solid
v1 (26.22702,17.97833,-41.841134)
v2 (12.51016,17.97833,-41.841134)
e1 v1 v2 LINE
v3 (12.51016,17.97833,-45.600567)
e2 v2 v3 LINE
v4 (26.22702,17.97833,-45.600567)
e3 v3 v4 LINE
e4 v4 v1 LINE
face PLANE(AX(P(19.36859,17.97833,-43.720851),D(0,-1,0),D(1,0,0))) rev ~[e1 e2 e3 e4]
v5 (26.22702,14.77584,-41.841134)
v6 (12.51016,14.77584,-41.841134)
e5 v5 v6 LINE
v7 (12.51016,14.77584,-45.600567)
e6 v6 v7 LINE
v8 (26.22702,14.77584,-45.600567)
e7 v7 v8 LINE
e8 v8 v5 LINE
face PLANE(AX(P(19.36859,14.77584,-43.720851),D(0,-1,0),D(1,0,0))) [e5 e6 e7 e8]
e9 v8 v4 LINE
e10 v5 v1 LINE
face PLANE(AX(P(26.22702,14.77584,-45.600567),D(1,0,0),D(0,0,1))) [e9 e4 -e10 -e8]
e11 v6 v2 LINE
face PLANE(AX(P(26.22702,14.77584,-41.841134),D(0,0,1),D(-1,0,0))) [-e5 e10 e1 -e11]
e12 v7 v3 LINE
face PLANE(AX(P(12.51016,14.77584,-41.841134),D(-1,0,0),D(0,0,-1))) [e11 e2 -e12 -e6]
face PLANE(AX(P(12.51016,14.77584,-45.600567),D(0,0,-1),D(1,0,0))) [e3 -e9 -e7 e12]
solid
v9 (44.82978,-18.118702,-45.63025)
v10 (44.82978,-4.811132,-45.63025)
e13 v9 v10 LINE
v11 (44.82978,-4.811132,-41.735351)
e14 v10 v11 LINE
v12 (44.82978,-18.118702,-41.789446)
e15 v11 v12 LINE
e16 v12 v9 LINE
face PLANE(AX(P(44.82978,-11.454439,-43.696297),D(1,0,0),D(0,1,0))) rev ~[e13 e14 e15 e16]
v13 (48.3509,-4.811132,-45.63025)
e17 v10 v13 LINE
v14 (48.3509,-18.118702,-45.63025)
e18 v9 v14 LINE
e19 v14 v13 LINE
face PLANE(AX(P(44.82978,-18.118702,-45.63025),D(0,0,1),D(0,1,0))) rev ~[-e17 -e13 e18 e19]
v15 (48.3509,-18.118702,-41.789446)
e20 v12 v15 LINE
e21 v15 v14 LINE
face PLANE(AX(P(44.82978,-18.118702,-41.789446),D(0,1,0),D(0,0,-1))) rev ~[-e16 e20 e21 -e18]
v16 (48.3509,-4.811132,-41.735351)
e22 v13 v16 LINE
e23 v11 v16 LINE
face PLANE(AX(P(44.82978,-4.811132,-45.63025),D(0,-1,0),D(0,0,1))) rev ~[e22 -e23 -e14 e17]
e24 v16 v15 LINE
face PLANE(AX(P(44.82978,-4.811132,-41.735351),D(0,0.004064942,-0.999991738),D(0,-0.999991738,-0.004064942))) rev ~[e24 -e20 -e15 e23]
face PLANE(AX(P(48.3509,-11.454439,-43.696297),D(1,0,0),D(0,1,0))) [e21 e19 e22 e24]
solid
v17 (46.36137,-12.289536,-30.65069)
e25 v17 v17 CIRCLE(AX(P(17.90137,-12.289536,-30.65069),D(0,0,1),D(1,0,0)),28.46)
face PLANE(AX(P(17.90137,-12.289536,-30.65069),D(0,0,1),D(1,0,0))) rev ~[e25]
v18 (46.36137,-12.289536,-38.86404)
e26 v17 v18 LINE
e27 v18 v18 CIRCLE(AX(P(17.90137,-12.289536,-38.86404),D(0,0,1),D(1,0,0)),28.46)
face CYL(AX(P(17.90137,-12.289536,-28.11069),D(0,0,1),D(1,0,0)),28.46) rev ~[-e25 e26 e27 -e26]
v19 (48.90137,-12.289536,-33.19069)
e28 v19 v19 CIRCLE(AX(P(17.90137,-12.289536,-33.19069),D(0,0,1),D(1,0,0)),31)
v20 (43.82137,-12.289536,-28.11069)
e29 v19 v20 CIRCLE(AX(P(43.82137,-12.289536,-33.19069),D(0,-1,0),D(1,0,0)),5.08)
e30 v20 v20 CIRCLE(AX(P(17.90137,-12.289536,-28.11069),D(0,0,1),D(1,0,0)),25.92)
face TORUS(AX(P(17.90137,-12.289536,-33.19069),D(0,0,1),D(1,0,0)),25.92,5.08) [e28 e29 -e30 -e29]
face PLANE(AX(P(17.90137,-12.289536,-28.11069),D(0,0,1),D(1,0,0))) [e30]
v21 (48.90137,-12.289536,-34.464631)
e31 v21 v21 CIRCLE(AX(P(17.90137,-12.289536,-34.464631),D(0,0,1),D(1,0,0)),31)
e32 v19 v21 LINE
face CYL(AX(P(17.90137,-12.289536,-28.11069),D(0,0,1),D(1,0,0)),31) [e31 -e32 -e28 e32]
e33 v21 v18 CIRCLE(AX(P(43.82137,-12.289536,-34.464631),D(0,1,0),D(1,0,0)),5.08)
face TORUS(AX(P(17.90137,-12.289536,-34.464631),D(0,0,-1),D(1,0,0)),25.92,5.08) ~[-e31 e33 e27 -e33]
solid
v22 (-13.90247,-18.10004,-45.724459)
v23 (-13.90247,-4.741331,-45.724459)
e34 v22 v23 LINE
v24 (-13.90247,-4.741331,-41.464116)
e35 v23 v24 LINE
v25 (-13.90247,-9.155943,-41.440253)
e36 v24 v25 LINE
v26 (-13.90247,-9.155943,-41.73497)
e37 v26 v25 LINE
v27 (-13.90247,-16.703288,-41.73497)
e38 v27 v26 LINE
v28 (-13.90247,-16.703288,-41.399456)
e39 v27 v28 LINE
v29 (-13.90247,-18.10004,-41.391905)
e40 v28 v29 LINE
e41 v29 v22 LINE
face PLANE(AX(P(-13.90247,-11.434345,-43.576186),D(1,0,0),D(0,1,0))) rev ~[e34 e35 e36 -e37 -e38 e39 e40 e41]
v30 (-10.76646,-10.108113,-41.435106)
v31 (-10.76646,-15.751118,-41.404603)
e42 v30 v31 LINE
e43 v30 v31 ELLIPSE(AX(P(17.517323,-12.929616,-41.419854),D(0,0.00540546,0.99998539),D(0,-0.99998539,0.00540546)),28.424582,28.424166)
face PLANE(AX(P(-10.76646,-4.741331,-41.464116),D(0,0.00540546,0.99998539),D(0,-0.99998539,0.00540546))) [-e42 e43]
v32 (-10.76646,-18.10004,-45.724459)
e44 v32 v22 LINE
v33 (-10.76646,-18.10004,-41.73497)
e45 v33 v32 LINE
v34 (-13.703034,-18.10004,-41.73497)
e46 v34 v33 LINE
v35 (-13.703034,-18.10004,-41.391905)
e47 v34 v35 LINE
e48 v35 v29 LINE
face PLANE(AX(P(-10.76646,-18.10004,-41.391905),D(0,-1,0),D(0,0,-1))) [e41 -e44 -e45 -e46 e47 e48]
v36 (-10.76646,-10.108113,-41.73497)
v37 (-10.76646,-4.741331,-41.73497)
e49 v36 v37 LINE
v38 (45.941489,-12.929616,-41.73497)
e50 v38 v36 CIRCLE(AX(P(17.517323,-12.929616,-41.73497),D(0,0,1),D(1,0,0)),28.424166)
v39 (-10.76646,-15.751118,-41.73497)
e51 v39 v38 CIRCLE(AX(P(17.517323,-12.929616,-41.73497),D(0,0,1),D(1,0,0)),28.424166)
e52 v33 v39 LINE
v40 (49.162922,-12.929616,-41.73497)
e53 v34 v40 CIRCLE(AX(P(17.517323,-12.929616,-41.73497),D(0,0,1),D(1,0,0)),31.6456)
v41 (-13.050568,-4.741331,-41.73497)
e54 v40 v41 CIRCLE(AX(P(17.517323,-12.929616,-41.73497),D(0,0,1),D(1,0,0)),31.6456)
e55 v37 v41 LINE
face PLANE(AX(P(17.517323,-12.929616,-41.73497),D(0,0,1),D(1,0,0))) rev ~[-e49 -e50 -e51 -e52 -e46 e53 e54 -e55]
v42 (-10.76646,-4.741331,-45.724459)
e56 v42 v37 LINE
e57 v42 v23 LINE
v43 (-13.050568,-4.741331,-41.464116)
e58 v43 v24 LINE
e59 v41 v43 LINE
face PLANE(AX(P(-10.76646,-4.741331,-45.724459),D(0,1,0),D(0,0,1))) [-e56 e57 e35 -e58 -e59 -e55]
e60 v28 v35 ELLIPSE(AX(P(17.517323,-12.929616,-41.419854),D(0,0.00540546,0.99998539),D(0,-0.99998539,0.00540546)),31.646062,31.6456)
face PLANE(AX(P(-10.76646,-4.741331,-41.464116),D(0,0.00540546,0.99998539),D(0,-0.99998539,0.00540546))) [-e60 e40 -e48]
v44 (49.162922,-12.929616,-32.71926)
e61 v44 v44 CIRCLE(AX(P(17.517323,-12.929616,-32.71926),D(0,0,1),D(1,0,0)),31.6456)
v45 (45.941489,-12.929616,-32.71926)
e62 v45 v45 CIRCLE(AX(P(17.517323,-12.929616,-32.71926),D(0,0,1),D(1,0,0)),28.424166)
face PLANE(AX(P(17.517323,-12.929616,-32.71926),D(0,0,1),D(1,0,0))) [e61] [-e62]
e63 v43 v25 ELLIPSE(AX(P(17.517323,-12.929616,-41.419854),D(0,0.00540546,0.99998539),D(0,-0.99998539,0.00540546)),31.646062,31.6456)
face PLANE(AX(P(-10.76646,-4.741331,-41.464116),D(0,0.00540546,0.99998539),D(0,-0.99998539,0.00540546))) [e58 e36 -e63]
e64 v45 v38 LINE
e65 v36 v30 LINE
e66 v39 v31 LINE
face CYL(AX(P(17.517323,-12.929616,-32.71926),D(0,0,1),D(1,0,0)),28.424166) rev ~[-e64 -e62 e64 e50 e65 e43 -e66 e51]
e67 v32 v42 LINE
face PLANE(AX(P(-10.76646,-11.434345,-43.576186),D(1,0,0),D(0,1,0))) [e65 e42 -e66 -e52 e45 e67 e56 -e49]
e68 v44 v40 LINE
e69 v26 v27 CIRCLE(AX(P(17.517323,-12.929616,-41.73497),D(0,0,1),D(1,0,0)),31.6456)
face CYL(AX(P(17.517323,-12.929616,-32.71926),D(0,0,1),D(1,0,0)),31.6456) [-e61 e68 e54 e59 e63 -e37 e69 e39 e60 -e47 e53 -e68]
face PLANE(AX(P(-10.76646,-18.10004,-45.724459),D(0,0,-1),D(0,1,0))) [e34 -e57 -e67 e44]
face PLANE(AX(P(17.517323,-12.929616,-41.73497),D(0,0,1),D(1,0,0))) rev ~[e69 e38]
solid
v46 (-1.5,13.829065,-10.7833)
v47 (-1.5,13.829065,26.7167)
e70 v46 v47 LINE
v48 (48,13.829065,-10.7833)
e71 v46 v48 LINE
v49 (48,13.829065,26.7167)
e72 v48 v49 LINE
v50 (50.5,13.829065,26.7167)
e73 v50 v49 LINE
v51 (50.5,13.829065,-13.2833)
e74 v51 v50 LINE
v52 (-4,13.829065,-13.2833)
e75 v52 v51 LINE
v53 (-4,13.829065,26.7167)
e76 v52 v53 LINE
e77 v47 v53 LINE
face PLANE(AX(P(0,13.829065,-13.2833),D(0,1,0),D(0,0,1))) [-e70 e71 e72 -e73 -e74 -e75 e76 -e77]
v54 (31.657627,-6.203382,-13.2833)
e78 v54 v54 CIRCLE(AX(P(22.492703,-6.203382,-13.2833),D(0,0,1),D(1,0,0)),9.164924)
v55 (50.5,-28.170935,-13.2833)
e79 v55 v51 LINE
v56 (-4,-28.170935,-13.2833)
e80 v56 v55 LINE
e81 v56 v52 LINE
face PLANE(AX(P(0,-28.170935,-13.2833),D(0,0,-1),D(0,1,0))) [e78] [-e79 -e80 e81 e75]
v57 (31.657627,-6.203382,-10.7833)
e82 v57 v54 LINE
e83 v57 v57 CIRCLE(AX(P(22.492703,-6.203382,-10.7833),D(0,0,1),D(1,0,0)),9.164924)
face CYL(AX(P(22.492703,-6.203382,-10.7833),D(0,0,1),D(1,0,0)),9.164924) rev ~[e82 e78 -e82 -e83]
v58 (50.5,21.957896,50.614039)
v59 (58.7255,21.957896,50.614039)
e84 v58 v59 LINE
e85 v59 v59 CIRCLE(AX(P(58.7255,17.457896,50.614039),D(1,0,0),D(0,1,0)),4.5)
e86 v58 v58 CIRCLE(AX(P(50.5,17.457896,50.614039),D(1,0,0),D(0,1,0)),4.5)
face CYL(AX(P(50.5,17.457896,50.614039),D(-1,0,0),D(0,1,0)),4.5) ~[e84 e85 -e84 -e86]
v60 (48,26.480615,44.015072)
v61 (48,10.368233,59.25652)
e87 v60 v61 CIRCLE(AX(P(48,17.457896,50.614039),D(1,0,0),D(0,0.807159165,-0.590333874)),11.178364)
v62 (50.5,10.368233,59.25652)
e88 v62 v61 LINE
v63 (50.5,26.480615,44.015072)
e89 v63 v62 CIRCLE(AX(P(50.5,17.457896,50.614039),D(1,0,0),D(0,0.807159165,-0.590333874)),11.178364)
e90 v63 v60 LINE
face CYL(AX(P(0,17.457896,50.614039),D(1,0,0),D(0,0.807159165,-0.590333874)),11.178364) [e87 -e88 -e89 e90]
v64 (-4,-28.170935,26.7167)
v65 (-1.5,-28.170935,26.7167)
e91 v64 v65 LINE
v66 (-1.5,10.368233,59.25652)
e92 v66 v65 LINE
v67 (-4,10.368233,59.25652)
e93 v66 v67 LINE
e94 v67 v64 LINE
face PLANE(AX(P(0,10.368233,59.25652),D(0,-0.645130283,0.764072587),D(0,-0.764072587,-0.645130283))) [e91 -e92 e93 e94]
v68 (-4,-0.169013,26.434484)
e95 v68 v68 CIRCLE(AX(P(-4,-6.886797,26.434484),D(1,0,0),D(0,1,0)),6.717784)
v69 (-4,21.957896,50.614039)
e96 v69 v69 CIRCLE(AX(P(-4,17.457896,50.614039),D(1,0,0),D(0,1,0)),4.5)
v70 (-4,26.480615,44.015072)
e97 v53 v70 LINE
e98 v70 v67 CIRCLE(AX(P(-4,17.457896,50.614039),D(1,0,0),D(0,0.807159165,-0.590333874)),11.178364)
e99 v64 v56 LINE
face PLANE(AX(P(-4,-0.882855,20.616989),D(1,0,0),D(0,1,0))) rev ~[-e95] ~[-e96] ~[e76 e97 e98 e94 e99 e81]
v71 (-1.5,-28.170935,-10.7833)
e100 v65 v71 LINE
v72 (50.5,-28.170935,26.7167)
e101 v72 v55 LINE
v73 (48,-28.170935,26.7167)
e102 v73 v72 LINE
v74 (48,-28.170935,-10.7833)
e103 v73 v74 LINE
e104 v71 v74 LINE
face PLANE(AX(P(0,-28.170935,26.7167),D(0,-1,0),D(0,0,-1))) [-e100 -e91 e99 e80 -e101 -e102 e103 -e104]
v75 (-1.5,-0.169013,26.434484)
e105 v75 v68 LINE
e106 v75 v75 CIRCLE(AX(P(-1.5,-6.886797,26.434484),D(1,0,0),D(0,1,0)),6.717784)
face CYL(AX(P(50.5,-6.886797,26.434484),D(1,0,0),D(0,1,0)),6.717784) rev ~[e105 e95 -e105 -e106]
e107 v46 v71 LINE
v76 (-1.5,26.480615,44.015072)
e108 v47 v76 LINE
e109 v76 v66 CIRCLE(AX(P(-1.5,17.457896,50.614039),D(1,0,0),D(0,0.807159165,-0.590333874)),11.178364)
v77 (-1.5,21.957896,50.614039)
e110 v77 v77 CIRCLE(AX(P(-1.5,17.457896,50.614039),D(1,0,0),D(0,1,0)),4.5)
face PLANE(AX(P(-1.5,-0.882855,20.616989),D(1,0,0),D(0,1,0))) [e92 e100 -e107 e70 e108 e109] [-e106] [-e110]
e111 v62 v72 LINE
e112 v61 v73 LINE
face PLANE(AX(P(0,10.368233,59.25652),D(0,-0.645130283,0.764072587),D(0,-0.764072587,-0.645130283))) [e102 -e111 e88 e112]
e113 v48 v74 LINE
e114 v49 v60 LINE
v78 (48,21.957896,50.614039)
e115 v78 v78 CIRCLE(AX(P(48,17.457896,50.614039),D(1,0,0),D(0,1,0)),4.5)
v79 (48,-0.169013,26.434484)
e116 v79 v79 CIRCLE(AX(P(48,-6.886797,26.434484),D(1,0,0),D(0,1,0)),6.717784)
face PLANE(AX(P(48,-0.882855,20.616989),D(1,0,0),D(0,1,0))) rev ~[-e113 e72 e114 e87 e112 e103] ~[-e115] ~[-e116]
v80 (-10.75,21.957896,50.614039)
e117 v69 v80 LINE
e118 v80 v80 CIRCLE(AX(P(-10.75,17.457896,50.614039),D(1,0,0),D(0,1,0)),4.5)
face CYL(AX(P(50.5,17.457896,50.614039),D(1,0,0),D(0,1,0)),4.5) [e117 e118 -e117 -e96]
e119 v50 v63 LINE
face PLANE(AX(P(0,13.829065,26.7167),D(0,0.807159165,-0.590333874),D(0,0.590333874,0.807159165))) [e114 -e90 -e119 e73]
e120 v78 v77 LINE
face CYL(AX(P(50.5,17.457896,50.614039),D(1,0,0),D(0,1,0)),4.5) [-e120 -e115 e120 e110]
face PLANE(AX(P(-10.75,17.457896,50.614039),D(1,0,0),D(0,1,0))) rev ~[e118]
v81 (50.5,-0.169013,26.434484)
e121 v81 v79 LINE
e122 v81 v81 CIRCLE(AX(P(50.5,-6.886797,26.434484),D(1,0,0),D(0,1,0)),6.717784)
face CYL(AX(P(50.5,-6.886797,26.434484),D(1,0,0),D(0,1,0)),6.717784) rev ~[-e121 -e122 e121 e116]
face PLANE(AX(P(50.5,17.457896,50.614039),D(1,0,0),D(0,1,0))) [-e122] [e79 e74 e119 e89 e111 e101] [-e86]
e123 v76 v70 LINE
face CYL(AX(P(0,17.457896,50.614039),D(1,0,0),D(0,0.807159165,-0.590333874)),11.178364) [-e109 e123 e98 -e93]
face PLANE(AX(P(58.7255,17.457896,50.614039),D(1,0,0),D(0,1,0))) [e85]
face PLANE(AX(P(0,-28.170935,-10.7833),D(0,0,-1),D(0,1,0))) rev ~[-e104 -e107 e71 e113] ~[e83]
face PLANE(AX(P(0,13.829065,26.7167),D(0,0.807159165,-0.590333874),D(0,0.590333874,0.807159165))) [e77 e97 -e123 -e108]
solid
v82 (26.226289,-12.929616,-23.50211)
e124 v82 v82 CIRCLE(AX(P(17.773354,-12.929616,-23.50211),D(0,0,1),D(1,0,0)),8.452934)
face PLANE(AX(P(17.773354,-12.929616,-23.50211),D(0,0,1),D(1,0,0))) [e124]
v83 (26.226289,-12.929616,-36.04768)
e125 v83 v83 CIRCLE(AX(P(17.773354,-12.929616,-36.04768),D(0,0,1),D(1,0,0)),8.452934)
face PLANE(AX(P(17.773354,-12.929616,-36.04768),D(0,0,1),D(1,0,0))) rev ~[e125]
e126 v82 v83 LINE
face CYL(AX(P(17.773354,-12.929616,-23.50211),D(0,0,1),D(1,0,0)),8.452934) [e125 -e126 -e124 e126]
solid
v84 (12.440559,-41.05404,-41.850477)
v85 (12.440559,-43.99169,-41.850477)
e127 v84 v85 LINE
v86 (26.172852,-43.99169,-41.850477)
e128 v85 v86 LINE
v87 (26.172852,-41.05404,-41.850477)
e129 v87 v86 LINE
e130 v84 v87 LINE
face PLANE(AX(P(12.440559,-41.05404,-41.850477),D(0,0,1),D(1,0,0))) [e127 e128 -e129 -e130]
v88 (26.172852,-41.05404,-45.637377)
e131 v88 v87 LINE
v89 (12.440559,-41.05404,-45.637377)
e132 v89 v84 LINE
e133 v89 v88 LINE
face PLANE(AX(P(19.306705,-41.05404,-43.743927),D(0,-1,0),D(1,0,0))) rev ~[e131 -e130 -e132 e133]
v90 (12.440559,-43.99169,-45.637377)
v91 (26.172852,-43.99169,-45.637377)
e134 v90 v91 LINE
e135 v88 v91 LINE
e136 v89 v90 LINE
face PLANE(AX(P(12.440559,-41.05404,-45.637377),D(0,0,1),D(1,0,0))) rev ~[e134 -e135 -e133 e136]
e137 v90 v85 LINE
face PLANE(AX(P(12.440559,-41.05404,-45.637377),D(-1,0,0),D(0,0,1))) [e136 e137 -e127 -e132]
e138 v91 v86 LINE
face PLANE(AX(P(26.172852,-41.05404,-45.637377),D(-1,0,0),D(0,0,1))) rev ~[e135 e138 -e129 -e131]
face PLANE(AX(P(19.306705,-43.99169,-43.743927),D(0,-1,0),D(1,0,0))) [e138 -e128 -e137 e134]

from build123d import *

# Parameters (mm, degrees)
F1_DEPTH       = 50.5
F1_DEPTH_BACK  = 4
F3_START       = -28.11069
F2_R           = 31
F3_DEPTH       = 10.75335
F4_T           = -2.54
F6_START       = -23.50211
F5_R           = 8.452934194
F6_DEPTH       = 12.54557
F8_START       = -32.71926
F7_R           = 31.6455996423
F7_R_2         = 28.4241664141
F8_DEPTH       = 9.01571
F10_START      = -14.77584
F10_DEPTH      = 3.20249
F12_START      = 41.05404
F11_W          = 13.7322936207
F11_H          = 3.7868991494
F12_DEPTH      = 2.93765
F14_START      = -10.76646
F14_DEPTH      = 3.13601
F16_START      = 44.82978
F16_DEPTH      = 3.52112
F18_T          = -2.5
F19_R          = 6.7177835251
F20_DEPTH      = 64.6292769679
F19_R_2        = 4.5
F21_DEPTH      = 61.25
F21_DEPTH_BACK = 8.2255
F22_R          = 9.1649239527
F23_DEPTH      = 25


# Not quite as in the source:
# - a fillet or chamfer that OpenCascade refuses, or shapes differently, is made with other operations: its cross-section is extruded or revolved along the edge and cut away or added
# - a feature names something its author has since deleted; it is built from what else it names


with BuildPart() as f1:
    # F0 (on Right) → F1 (new body, two sides)
    with BuildSketch(Plane.YZ) as f1_sk:
        with BuildLine():
            Line((10.3682326153, 59.2565201223), (-28.1709354445, 26.7167001963))
            Line((-28.1709354445, 26.7167001963), (-28.1709354445, -13.2832998037))
            Line((-28.1709354445, -13.2832998037), (13.8290645555, -13.2832998037))
            Line((13.8290645555, -13.2832998037), (13.8290645555, 26.7167001963))
            Line((13.8290645555, 26.7167001963), (26.480615139, 44.0150722861))
            ThreePointArc((26.480615139, 44.0150722861), (25.1396676432, 58.7347658993), (10.3682326153, 59.2565201223))
        make_face()
    extrude(amount=F1_DEPTH)
    extrude(f1_sk.sketch, amount=-F1_DEPTH_BACK)

    # F18
    f18_openings = [f1.faces().sort_by_distance(p)[0] for p in [
        (23.25, -28.170935, 6.7167),
        (23.25, -8.901351, 42.98661),
        (23.25, 25.139668, 58.734766),
        (23.25, 20.15484, 35.365886),
        (23.25, 13.829065, 6.7167),
    ]]
    offset(amount=F18_T, openings=f18_openings)

    # F19 (on face) → F20 (cut, through all)
    with BuildSketch(Plane.YZ.offset(50.5)):
        with Locations((-6.886796712, 26.4344837213)):
            Circle(F19_R)
    extrude(amount=-F20_DEPTH, mode=Mode.SUBTRACT)

    # F19 (on face) → F21 (join, two sides)
    with BuildSketch(Plane.YZ.offset(50.5)) as f21_sk:
        with Locations((17.4578964769, 50.6140389959)):
            Circle(F19_R_2)
    extrude(amount=-F21_DEPTH)
    extrude(f21_sk.sketch, amount=F21_DEPTH_BACK)

    # F22 (on face) → F23 (cut)
    with BuildSketch(Plane.XY.offset(-10.7832998037)):
        with Locations((22.4927030504, -6.2033818103)):
            Circle(F22_R)
    extrude(amount=-F23_DEPTH, mode=Mode.SUBTRACT)


with BuildPart() as f3:
    # F2 (on Top) → F3 (new body)
    with BuildSketch(Plane.XY.offset(F3_START)):
        with Locations((17.9013703018, -12.2895361856)):
            Circle(F2_R)
    extrude(amount=-F3_DEPTH)

    # F4
    f4_openings = [f3.faces().sort_by_distance(p)[0] for p in [
        (17.90137, -12.289536, -38.86404),
    ]]
    offset(amount=F4_T, openings=f4_openings)

    # F17: fillet of radius 5.08 on 2 edges, made by hand

    # F17_s1 → F17_t2 (revolve, cut)
    with BuildSketch(Plane.XZ.offset(12.2895361856)):
        with BuildLine():
            ThreePointArc((48.9013703018, -33.19069), (47.4134727503, -29.5985875516), (43.8213703018, -28.11069))
            Line((43.8213703018, -28.11069), (43.8213703018, -28.00909))
            Line((43.8213703018, -28.00909), (49.0029703018, -28.00909))
            Line((49.0029703018, -28.00909), (49.0029703018, -33.19069))
            Line((49.0029703018, -33.19069), (48.9013703018, -33.19069))
        make_face()
    revolve(axis=Axis((17.9013703018, -12.2895361856, -28.11069), (0, 0, 1)), mode=Mode.SUBTRACT)

    # F17_s3 → F17_t4 (revolve, cut)
    with BuildSketch(Plane.XZ.offset(12.2895361856)):
        with BuildLine():
            ThreePointArc((48.9013703018, -34.4646309488), (48.2207793531, -37.0046309488), (46.3613703018, -38.86404))
            Line((46.3613703018, -38.86404), (46.4121703018, -38.952028181))
            ThreePointArc((46.4121703018, -38.952028181), (47.6313703018, -38.96564), (48.9013703018, -38.96564))
            Line((48.9013703018, -38.96564), (49.0029703018, -38.86404))
            Line((49.0029703018, -38.86404), (49.0029703018, -34.4646309488))
            Line((49.0029703018, -34.4646309488), (48.9013703018, -34.4646309488))
        make_face()
    revolve(axis=Axis((17.9013703018, -12.2895361856, -38.86404), (0, 0, 1)), mode=Mode.SUBTRACT)


with BuildPart() as f6:
    # F5 (on Top) → F6 (new body)
    with BuildSketch(Plane.XY.offset(F6_START)):
        with Locations((17.773354426, -12.9296155646)):
            Circle(F5_R)
    extrude(amount=-F6_DEPTH)


with BuildPart() as f8:
    # F7 (on Top) → F8 (new body)
    with BuildSketch(Plane.XY.offset(F8_START)):
        with Locations((17.5173226744, -12.9296155646)):
            Circle(F7_R)
        with Locations((17.5173226744, -12.9296155646)):
            Circle(F7_R_2, mode=Mode.SUBTRACT)
    extrude(amount=-F8_DEPTH)

    # F13 (on Right) → F14 (join)
    with BuildSketch(Plane.YZ.offset(F14_START)):
        Polygon((-4.7413306311, -41.4641164243), (-18.1000400335, -41.3919053972), (-18.1000400335, -45.7244589925), (-4.7413306311, -45.7244589925), align=None)
    extrude(amount=-F14_DEPTH)


with BuildPart() as f10:
    # F9 (on Front) → F10 (new body)
    with BuildSketch(Plane.XZ.offset(F10_START)):
        Polygon((26.2270197272, -41.841134429), (12.5101599842, -41.841134429), (12.5101599842, -45.600567013), (24.1948924959, -45.600567013), (26.2270197272, -45.600567013), align=None)
    extrude(amount=-F10_DEPTH)


with BuildPart() as f12:
    # F11 (on Front) → F12 (new body)
    with BuildSketch(Plane.XZ.offset(F12_START)):
        with Locations((19.3067053333, -43.7439270318)):
            Rectangle(F11_W, F11_H)
    extrude(amount=F12_DEPTH)


with BuildPart() as f16:
    # F15 (on Right) → F16 (new body)
    with BuildSketch(Plane.YZ.offset(F16_START)):
        Polygon((-18.1187018752, -45.6302501261), (-4.8111323267, -45.6302501261), (-4.8111323267, -41.7353510857), (-18.1187018752, -41.7894460261), align=None)
    extrude(amount=F16_DEPTH)


solid = Compound([f1.part, f3.part, f6.part, f8.part, f10.part, f12.part, f16.part])
